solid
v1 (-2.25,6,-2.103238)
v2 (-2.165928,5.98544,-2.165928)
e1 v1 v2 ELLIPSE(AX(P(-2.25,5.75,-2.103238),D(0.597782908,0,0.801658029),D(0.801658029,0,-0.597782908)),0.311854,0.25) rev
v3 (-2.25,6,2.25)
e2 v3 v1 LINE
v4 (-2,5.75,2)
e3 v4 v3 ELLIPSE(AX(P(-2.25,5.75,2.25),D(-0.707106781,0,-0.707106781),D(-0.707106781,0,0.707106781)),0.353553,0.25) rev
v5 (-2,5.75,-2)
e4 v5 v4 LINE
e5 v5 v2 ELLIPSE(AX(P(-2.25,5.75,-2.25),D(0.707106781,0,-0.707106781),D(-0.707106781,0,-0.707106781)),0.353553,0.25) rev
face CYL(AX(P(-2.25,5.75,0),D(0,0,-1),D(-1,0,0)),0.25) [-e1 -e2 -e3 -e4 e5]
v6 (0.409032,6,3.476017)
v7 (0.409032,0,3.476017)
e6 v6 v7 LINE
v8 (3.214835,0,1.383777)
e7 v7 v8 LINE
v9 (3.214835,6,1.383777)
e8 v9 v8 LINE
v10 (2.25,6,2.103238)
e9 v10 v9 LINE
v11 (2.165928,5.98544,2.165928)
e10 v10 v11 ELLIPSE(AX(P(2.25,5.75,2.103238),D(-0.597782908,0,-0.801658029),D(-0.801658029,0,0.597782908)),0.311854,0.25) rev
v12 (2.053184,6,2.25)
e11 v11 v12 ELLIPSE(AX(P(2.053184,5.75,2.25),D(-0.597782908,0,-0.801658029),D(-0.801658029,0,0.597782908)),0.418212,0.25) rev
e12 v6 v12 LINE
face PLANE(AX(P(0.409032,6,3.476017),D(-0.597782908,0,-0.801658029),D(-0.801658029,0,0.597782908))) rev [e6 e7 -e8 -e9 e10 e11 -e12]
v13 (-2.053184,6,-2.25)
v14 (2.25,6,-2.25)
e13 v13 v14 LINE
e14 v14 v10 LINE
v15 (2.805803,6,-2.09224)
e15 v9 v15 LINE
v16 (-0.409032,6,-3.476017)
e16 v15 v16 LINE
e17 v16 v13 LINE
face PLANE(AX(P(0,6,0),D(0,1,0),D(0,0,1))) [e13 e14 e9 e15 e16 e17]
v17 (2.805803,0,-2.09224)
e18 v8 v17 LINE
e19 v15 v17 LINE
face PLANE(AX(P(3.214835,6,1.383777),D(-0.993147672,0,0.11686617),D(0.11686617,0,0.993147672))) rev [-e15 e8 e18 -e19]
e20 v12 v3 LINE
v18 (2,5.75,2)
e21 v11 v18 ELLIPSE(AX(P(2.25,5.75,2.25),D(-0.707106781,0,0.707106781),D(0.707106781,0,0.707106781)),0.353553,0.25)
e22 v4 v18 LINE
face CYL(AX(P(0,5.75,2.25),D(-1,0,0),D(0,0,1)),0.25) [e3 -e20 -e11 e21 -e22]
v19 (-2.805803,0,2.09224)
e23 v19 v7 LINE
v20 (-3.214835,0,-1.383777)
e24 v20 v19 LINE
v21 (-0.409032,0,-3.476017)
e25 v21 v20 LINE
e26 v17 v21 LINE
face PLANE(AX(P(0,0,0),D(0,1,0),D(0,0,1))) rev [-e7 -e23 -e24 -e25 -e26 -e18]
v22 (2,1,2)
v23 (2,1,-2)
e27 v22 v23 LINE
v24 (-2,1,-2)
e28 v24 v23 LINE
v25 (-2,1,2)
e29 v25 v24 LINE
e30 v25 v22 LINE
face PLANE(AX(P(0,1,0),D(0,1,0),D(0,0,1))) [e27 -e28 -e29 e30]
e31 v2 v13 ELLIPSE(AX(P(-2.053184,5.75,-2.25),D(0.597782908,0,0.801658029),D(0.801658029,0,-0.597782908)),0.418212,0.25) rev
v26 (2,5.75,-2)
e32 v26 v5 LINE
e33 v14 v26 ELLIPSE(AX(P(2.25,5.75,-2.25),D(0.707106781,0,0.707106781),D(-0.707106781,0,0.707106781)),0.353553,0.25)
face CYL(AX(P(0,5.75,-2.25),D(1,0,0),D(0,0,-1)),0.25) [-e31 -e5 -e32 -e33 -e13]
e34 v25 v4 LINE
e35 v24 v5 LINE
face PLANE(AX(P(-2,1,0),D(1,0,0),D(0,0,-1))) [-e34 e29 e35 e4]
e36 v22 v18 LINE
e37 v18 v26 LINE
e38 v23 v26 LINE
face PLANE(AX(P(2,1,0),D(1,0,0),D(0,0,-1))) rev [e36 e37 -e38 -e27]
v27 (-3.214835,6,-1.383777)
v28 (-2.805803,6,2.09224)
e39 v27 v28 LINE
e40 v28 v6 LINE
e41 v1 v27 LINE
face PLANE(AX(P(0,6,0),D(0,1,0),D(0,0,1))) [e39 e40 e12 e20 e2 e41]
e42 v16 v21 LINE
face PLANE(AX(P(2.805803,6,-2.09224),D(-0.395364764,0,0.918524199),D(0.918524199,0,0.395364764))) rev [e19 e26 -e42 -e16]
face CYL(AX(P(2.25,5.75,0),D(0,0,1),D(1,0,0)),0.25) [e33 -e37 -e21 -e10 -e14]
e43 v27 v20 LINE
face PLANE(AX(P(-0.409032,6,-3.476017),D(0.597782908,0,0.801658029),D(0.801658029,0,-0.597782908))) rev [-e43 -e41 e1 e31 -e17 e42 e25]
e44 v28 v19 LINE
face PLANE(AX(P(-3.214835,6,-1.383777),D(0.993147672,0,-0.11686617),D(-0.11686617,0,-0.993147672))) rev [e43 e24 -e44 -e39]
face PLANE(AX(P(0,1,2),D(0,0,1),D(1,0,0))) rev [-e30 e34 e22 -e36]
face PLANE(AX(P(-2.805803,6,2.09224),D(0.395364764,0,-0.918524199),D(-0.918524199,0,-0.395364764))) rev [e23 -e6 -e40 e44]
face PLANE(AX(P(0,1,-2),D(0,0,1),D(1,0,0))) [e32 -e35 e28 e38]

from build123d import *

# Parameters (mm, degrees)
BOSS_EXTRUDE1_DEPTH = 6
SKETCH2_W           = 4
SKETCH2_H           = 4
CUT_EXTRUDE1_DEPTH  = 5
FILLET1_R           = 0.25


with BuildPart() as part:
    # Sketch1 → Boss-Extrude1 (new body)
    with BuildSketch(Plane(origin=(0, 0, 0), x_dir=(1, 0, 0), z_dir=(0, 1, 0))):
        Polygon((3.214834695, -1.383776673), (2.8058031, 2.092240179), (-0.409031596, 3.476016852), (-3.214834695, 1.383776673), (-2.8058031, -2.092240179), (0.409031596, -3.476016852), align=None)
    extrude(amount=BOSS_EXTRUDE1_DEPTH)

    # Sketch2 → Cut-Extrude1 (cut)
    with BuildSketch(Plane(origin=(0, 6, 0), x_dir=(1, 0, 0), z_dir=(0, 1, 0))):
        Rectangle(SKETCH2_W, SKETCH2_H)
    extrude(amount=-CUT_EXTRUDE1_DEPTH, mode=Mode.SUBTRACT)

    # Fillet1
    # the kernel refuses this fillet: 0.25 mm, written as the material it takes off along each edge
    with BuildSketch(Plane(origin=(-2, 6, -2), x_dir=(-1, 0, 0), z_dir=(0, 0, 1)), Plane(origin=(2, 6, -2), x_dir=(0, 0, -1), z_dir=(-1, 0, 0)), Plane(origin=(-2, 6, 2), x_dir=(0, 0, 1), z_dir=(1, 0, 0)), Plane(origin=(2, 6, 2), x_dir=(1, 0, 0), z_dir=(0, 0, -1))) as fillet1_piece_1:
        with BuildLine():
            CenterArc((FILLET1_R, FILLET1_R), FILLET1_R, 180, 90)
            Line((0, FILLET1_R), (-FILLET1_R * 0.02, FILLET1_R))
            Line((-FILLET1_R * 0.02, FILLET1_R), (-FILLET1_R * 0.02, -FILLET1_R * 0.02))
            Line((-FILLET1_R * 0.02, -FILLET1_R * 0.02), (FILLET1_R, -FILLET1_R * 0.02))
            Line((FILLET1_R, -FILLET1_R * 0.02), (FILLET1_R, 0))
        make_face()
    extrude(amount=4, mode=Mode.SUBTRACT)
    with BuildSketch(Plane(origin=(2, 6, -2), x_dir=(0, 0, -1), z_dir=(-1, 0, 0))) as fillet1_piece_2a_section:
        with BuildLine():
            CenterArc((FILLET1_R, FILLET1_R), FILLET1_R, 180, 90)
            Line((0, FILLET1_R), (-FILLET1_R * 0.02, FILLET1_R))
            Line((-FILLET1_R * 0.02, FILLET1_R), (-FILLET1_R * 0.02, -FILLET1_R * 0.02))
            Line((-FILLET1_R * 0.02, -FILLET1_R * 0.02), (FILLET1_R, -FILLET1_R * 0.02))
            Line((FILLET1_R, -FILLET1_R * 0.02), (FILLET1_R, 0))
        make_face()
    fillet1_piece_2a = extrude(amount=4.625, mode=Mode.PRIVATE)
    fillet1_piece_2a = split(fillet1_piece_2a, bisect_by=Plane(origin=(-2, 5.943401221, -2.056598779), z_dir=(-1, 0, 0)), keep=Keep.TOP, mode=Mode.PRIVATE)
    with BuildSketch(Plane(origin=(-2, 6, -2.625), x_dir=(-1, 0, 0), z_dir=(0, 0, 1))) as fillet1_piece_2b_section:
        with BuildLine():
            CenterArc((FILLET1_R, FILLET1_R), FILLET1_R, 180, 90)
            Line((0, FILLET1_R), (-FILLET1_R * 0.02, FILLET1_R))
            Line((-FILLET1_R * 0.02, FILLET1_R), (-FILLET1_R * 0.02, -FILLET1_R * 0.02))
            Line((-FILLET1_R * 0.02, -FILLET1_R * 0.02), (FILLET1_R, -FILLET1_R * 0.02))
            Line((FILLET1_R, -FILLET1_R * 0.02), (FILLET1_R, 0))
        make_face()
    fillet1_piece_2b = extrude(amount=4.625, mode=Mode.PRIVATE)
    fillet1_piece_2b = split(fillet1_piece_2b, bisect_by=Plane(origin=(-2.056598779, 5.943401221, -2), z_dir=(0, 0, -1)), keep=Keep.TOP, mode=Mode.PRIVATE)
    fillet1_piece_2 = fillet1_piece_2a & fillet1_piece_2b
    add(fillet1_piece_2, mode=Mode.SUBTRACT)
    with BuildSketch(Plane(origin=(-2.625, 6, 2), x_dir=(0, 0, 1), z_dir=(1, 0, 0))) as fillet1_piece_3a_section:
        with BuildLine():
            CenterArc((FILLET1_R, FILLET1_R), FILLET1_R, 180, 90)
            Line((0, FILLET1_R), (-FILLET1_R * 0.02, FILLET1_R))
            Line((-FILLET1_R * 0.02, FILLET1_R), (-FILLET1_R * 0.02, -FILLET1_R * 0.02))
            Line((-FILLET1_R * 0.02, -FILLET1_R * 0.02), (FILLET1_R, -FILLET1_R * 0.02))
            Line((FILLET1_R, -FILLET1_R * 0.02), (FILLET1_R, 0))
        make_face()
    fillet1_piece_3a = extrude(amount=4.625, mode=Mode.PRIVATE)
    fillet1_piece_3a = split(fillet1_piece_3a, bisect_by=Plane(origin=(-2, 5.943401221, 2.056598779), z_dir=(-1, 0, 0)), keep=Keep.TOP, mode=Mode.PRIVATE)
    with BuildSketch(Plane(origin=(-2, 6, -2), x_dir=(-1, 0, 0), z_dir=(0, 0, 1))) as fillet1_piece_3b_section:
        with BuildLine():
            CenterArc((FILLET1_R, FILLET1_R), FILLET1_R, 180, 90)
            Line((0, FILLET1_R), (-FILLET1_R * 0.02, FILLET1_R))
            Line((-FILLET1_R * 0.02, FILLET1_R), (-FILLET1_R * 0.02, -FILLET1_R * 0.02))
            Line((-FILLET1_R * 0.02, -FILLET1_R * 0.02), (FILLET1_R, -FILLET1_R * 0.02))
            Line((FILLET1_R, -FILLET1_R * 0.02), (FILLET1_R, 0))
        make_face()
    fillet1_piece_3b = extrude(amount=4.625, mode=Mode.PRIVATE)
    fillet1_piece_3b = split(fillet1_piece_3b, bisect_by=Plane(origin=(-2.056598779, 5.943401221, 2), z_dir=(0, 0, 1)), keep=Keep.TOP, mode=Mode.PRIVATE)
    fillet1_piece_3 = fillet1_piece_3a & fillet1_piece_3b
    add(fillet1_piece_3, mode=Mode.SUBTRACT)
    with BuildSketch(Plane(origin=(2, 6, 2), x_dir=(1, 0, 0), z_dir=(0, 0, -1))) as fillet1_piece_4a_section:
        with BuildLine():
            CenterArc((FILLET1_R, FILLET1_R), FILLET1_R, 180, 90)
            Line((0, FILLET1_R), (-FILLET1_R * 0.02, FILLET1_R))
            Line((-FILLET1_R * 0.02, FILLET1_R), (-FILLET1_R * 0.02, -FILLET1_R * 0.02))
            Line((-FILLET1_R * 0.02, -FILLET1_R * 0.02), (FILLET1_R, -FILLET1_R * 0.02))
            Line((FILLET1_R, -FILLET1_R * 0.02), (FILLET1_R, 0))
        make_face()
    fillet1_piece_4a = extrude(amount=4.625, mode=Mode.PRIVATE)
    fillet1_piece_4a = split(fillet1_piece_4a, bisect_by=Plane(origin=(2.056598779, 5.943401221, -2), z_dir=(0, 0, -1)), keep=Keep.TOP, mode=Mode.PRIVATE)
    with BuildSketch(Plane(origin=(2.625, 6, -2), x_dir=(0, 0, -1), z_dir=(-1, 0, 0))) as fillet1_piece_4b_section:
        with BuildLine():
            CenterArc((FILLET1_R, FILLET1_R), FILLET1_R, 180, 90)
            Line((0, FILLET1_R), (-FILLET1_R * 0.02, FILLET1_R))
            Line((-FILLET1_R * 0.02, FILLET1_R), (-FILLET1_R * 0.02, -FILLET1_R * 0.02))
            Line((-FILLET1_R * 0.02, -FILLET1_R * 0.02), (FILLET1_R, -FILLET1_R * 0.02))
            Line((FILLET1_R, -FILLET1_R * 0.02), (FILLET1_R, 0))
        make_face()
    fillet1_piece_4b = extrude(amount=4.625, mode=Mode.PRIVATE)
    fillet1_piece_4b = split(fillet1_piece_4b, bisect_by=Plane(origin=(2, 5.943401221, -2.056598779), z_dir=(1, 0, 0)), keep=Keep.TOP, mode=Mode.PRIVATE)
    fillet1_piece_4 = fillet1_piece_4a & fillet1_piece_4b
    add(fillet1_piece_4, mode=Mode.SUBTRACT)
    with BuildSketch(Plane(origin=(-2, 6, 2), x_dir=(0, 0, 1), z_dir=(1, 0, 0))) as fillet1_piece_5a_section:
        with BuildLine():
            CenterArc((FILLET1_R, FILLET1_R), FILLET1_R, 180, 90)
            Line((0, FILLET1_R), (-FILLET1_R * 0.02, FILLET1_R))
            Line((-FILLET1_R * 0.02, FILLET1_R), (-FILLET1_R * 0.02, -FILLET1_R * 0.02))
            Line((-FILLET1_R * 0.02, -FILLET1_R * 0.02), (FILLET1_R, -FILLET1_R * 0.02))
            Line((FILLET1_R, -FILLET1_R * 0.02), (FILLET1_R, 0))
        make_face()
    fillet1_piece_5a = extrude(amount=4.625, mode=Mode.PRIVATE)
    fillet1_piece_5a = split(fillet1_piece_5a, bisect_by=Plane(origin=(2, 5.943401221, 2.056598779), z_dir=(1, 0, 0)), keep=Keep.TOP, mode=Mode.PRIVATE)
    with BuildSketch(Plane(origin=(2, 6, 2.625), x_dir=(1, 0, 0), z_dir=(0, 0, -1))) as fillet1_piece_5b_section:
        with BuildLine():
            CenterArc((FILLET1_R, FILLET1_R), FILLET1_R, 180, 90)
            Line((0, FILLET1_R), (-FILLET1_R * 0.02, FILLET1_R))
            Line((-FILLET1_R * 0.02, FILLET1_R), (-FILLET1_R * 0.02, -FILLET1_R * 0.02))
            Line((-FILLET1_R * 0.02, -FILLET1_R * 0.02), (FILLET1_R, -FILLET1_R * 0.02))
            Line((FILLET1_R, -FILLET1_R * 0.02), (FILLET1_R, 0))
        make_face()
    fillet1_piece_5b = extrude(amount=4.625, mode=Mode.PRIVATE)
    fillet1_piece_5b = split(fillet1_piece_5b, bisect_by=Plane(origin=(2.056598779, 5.943401221, 2), z_dir=(0, 0, 1)), keep=Keep.TOP, mode=Mode.PRIVATE)
    fillet1_piece_5 = fillet1_piece_5a & fillet1_piece_5b
    add(fillet1_piece_5, mode=Mode.SUBTRACT)


solid = part.part
